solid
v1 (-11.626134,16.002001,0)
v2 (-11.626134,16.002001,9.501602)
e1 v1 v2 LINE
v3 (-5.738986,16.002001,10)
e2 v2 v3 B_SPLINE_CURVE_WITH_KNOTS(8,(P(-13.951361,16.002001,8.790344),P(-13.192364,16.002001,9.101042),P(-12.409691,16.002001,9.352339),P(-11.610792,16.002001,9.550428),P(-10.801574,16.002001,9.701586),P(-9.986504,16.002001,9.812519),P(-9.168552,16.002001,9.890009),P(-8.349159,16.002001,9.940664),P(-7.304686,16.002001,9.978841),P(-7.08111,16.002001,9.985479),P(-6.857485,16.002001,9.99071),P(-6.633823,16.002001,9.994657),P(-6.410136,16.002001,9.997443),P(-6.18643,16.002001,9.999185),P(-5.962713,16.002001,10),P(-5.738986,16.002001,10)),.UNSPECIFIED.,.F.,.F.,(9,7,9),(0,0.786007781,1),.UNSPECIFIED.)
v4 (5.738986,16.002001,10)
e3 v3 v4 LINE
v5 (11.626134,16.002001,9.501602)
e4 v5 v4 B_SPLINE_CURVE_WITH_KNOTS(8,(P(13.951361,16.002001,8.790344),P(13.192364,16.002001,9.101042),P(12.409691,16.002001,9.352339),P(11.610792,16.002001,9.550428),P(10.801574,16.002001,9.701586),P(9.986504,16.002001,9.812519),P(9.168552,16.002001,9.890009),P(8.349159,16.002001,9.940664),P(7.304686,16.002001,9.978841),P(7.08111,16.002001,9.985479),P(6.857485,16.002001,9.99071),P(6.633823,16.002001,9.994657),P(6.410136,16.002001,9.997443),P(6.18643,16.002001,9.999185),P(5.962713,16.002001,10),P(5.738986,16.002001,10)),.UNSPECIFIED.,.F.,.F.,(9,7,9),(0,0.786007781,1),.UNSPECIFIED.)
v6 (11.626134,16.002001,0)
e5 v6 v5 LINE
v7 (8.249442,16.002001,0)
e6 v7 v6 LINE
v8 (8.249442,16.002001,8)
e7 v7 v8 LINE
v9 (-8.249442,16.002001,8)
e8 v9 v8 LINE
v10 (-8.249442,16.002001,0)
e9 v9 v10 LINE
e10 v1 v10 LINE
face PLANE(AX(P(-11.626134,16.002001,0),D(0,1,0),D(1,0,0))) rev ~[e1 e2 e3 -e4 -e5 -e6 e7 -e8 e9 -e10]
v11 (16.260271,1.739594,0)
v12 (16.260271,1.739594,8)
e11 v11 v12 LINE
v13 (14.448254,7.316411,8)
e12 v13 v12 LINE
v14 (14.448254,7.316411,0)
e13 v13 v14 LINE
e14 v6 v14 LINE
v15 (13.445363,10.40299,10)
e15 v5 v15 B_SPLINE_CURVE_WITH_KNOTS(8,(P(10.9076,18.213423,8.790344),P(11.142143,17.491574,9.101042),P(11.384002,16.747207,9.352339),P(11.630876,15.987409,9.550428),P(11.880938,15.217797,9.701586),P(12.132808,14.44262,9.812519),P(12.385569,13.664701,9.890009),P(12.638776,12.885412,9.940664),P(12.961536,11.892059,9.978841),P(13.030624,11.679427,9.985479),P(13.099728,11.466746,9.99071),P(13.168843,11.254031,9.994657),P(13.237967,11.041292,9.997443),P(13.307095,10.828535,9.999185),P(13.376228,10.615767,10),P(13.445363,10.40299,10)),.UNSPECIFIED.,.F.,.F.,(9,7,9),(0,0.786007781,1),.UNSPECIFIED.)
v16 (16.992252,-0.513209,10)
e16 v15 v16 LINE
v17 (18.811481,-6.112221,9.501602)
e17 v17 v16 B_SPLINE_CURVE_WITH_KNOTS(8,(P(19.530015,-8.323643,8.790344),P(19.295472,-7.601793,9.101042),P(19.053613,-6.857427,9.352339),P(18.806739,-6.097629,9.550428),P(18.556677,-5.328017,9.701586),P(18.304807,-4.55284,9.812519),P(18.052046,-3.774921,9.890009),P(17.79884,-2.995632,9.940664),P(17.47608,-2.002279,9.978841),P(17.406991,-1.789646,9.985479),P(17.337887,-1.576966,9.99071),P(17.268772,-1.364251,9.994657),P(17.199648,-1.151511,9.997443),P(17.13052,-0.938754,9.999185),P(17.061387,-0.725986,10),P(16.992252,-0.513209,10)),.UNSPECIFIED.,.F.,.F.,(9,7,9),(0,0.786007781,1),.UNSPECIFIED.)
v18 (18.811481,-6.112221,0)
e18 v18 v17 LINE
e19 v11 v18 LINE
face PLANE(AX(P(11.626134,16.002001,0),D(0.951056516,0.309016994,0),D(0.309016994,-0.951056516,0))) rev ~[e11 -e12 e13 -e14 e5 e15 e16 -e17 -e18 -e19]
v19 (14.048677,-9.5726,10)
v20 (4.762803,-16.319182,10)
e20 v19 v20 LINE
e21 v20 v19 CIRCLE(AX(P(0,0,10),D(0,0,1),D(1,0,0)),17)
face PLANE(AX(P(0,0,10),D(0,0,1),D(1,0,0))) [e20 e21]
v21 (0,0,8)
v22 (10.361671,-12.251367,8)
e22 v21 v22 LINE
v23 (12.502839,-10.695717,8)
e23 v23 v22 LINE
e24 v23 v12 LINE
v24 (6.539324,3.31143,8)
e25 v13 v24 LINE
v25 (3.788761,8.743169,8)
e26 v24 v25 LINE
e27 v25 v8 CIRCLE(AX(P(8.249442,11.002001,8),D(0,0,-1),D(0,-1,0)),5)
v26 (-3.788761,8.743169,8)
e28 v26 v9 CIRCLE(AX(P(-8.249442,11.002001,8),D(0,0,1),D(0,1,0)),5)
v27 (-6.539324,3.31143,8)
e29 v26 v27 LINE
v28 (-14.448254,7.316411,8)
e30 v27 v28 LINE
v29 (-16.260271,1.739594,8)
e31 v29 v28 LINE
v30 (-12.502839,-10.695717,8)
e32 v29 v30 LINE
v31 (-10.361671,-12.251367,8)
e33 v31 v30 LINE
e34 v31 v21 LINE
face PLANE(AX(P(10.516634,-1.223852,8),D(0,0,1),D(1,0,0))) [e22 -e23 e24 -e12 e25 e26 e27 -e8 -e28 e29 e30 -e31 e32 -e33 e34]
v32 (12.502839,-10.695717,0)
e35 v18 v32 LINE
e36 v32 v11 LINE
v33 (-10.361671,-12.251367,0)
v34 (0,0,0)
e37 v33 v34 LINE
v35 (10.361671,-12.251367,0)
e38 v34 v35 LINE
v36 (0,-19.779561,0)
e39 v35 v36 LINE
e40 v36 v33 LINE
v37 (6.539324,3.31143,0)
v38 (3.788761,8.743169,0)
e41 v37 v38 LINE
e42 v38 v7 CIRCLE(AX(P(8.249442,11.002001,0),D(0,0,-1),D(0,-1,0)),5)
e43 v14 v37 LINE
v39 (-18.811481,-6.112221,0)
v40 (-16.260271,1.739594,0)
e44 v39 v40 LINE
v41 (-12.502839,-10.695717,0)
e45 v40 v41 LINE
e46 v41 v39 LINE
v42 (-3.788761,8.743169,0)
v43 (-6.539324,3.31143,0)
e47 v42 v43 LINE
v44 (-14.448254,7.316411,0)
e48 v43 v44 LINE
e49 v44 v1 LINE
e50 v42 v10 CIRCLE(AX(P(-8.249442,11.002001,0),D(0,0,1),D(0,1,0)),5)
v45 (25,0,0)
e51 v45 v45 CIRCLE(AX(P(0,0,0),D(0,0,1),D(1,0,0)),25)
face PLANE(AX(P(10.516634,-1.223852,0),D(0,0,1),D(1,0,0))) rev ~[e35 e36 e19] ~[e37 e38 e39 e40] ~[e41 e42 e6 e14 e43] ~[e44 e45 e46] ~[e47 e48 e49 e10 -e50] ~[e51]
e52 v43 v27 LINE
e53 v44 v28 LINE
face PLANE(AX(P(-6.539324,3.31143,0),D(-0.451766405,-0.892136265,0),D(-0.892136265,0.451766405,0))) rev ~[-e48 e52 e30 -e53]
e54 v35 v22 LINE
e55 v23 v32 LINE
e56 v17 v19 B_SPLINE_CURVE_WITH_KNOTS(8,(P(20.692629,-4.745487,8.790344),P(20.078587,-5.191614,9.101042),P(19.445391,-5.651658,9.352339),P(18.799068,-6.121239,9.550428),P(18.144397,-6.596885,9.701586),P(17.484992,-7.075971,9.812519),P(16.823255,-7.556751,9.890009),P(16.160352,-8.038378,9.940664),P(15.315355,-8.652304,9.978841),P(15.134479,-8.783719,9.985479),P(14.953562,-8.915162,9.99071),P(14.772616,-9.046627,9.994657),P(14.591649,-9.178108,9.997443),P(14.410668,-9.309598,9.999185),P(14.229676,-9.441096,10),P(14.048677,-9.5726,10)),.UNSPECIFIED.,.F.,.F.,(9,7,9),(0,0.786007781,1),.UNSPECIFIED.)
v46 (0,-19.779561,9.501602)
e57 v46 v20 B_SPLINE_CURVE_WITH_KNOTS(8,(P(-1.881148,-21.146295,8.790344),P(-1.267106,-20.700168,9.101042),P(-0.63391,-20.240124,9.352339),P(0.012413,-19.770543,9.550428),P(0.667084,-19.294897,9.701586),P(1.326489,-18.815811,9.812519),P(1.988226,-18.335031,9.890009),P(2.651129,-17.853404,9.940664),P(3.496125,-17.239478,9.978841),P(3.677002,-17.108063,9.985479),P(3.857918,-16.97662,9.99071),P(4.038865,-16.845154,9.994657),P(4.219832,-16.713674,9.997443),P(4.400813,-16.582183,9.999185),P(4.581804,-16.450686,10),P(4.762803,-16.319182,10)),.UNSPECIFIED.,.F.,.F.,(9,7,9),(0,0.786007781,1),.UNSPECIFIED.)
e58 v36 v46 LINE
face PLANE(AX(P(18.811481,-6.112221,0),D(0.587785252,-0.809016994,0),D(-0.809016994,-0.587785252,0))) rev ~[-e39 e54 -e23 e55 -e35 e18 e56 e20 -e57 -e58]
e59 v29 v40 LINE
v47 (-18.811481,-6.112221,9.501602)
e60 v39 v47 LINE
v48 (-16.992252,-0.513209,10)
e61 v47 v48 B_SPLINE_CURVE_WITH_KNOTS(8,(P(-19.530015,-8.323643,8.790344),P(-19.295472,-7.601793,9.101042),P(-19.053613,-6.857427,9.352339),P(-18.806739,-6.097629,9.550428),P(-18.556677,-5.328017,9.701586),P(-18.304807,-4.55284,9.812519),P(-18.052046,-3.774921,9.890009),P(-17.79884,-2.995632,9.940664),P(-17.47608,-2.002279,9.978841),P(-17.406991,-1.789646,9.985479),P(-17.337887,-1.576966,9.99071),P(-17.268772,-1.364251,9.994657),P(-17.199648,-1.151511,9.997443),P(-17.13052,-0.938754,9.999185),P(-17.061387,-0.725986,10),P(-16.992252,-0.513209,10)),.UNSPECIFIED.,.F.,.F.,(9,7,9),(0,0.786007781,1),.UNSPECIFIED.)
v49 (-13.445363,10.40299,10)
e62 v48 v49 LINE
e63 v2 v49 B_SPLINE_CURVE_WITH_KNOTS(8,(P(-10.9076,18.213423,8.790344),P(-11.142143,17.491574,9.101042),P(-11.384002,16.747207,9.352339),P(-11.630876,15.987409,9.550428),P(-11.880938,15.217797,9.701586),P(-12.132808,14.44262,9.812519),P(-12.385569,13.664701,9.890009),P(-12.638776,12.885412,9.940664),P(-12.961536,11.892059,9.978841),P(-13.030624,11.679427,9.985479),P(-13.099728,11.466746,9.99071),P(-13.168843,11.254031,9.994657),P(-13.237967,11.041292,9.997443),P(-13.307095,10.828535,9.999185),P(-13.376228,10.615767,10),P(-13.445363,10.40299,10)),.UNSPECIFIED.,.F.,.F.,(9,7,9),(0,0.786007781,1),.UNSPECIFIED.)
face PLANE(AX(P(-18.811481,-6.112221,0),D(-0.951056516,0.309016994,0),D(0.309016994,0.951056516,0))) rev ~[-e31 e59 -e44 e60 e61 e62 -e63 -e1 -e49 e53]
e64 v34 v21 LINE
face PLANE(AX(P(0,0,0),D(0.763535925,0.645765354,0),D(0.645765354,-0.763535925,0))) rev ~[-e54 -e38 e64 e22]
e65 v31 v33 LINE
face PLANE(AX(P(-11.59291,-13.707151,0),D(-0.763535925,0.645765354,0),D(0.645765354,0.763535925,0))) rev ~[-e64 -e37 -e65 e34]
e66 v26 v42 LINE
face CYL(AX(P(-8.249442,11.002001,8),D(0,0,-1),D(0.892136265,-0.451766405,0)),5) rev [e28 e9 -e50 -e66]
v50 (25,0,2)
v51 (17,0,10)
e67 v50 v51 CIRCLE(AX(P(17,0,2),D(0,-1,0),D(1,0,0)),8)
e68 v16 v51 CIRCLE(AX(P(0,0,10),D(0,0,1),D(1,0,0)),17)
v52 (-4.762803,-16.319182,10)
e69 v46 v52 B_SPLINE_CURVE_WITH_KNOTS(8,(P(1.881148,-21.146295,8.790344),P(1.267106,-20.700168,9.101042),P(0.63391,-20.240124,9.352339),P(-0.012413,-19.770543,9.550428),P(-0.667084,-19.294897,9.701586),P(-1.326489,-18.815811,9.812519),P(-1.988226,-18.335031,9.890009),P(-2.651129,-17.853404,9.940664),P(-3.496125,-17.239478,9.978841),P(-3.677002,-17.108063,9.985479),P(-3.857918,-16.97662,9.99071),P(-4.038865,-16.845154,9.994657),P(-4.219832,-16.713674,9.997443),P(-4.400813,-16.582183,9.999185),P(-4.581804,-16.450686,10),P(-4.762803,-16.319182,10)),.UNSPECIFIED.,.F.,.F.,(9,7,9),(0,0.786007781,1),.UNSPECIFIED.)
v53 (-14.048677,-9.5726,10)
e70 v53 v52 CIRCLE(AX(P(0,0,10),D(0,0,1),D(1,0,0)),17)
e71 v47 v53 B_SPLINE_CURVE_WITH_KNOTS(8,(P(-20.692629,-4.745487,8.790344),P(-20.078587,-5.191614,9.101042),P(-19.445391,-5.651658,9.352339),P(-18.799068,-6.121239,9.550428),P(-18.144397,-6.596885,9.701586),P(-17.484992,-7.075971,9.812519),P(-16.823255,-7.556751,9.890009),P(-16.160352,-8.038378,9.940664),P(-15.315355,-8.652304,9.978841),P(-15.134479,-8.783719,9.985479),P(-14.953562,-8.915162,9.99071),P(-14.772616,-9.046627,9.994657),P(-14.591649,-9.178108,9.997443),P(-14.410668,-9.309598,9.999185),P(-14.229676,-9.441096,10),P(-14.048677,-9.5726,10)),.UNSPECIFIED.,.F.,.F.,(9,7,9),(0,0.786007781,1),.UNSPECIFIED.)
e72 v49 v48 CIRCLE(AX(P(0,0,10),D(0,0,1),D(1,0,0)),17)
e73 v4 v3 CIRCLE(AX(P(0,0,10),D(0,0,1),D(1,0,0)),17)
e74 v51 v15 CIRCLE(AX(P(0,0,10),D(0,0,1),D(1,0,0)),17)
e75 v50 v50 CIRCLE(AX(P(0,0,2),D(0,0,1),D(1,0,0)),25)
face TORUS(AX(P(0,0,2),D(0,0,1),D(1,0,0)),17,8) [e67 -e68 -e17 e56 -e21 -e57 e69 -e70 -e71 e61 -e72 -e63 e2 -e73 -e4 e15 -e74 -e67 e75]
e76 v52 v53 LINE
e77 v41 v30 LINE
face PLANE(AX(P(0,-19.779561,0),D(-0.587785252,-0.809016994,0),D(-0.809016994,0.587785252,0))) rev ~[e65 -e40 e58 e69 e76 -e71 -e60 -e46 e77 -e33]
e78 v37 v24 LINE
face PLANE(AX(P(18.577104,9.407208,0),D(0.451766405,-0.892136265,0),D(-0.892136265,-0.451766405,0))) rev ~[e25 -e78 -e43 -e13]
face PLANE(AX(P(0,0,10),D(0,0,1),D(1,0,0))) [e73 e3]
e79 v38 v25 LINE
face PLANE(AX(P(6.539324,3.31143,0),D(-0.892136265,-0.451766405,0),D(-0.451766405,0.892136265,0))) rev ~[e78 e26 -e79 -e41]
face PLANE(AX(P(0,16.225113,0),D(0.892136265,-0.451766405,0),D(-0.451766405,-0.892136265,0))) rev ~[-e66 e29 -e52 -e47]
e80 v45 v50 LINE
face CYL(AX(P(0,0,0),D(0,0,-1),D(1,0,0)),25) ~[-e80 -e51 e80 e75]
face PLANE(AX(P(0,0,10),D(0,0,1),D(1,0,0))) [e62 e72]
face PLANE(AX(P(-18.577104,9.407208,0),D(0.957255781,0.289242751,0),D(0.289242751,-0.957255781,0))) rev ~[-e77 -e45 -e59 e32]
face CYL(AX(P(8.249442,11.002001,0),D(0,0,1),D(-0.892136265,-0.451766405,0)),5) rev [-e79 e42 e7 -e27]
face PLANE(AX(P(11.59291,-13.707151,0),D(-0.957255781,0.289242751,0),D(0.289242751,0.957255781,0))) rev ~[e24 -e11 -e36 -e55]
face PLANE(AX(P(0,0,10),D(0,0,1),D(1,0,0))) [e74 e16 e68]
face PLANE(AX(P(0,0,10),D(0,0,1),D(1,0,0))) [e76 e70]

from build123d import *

# Parameters (mm, degrees)
F0_R     = 25
F1_DEPTH = 10
F4_DEPTH = 8
F5_R     = 5


# Not quite as in the source:
# - a fillet or chamfer that OpenCascade refuses, or shapes differently, is made with other operations: its cross-section is extruded or revolved along the edge and cut away or added


with BuildPart() as f1:
    # F0 (on Top) → F1 (new body)
    with BuildSketch(Plane.XY):
        Circle(F0_R)
        Polygon((-18.8114806731, -6.112220586), (-11.6261344347, 16.0020012408), (11.6261344347, 16.0020012408), (18.8114806731, -6.112220586), (0, -19.7795613097), align=None, mode=Mode.SUBTRACT)
    extrude(amount=F1_DEPTH)

    # F2: fillet of radius 8 on 1 edges, made by hand

    # F2_s1 → F2_t2 (revolve, cut)
    with BuildSketch(Plane.XZ):
        with BuildLine():
            ThreePointArc((25, 2), (22.6568542495, 7.6568542495), (17, 10))
            Line((17, 10), (25, 10))
            Line((25, 10), (25, 2))
        make_face()
    revolve(axis=Axis((0, 0, 10), (0, 0, 1)), mode=Mode.SUBTRACT)

    # F3 (on Top) → F4 (join)
    with BuildSketch(Plane.XY):
        Polygon((6.539323839, 3.3114300304), (0, 0), (11.5929096937, -13.7071507052), (18.5771044344, 9.4072083011), align=None)
        Polygon((-6.539323839, 3.3114300304), (0, 0), (6.539323839, 3.3114300304), (0, 16.2251126021), align=None)
        Polygon((-11.5929096937, -13.7071507052), (0, 0), (-6.539323839, 3.3114300304), (-18.5771044344, 9.4072083011), align=None)
    extrude(amount=F4_DEPTH)

    # F5
    f5_edges = [f1.edges().sort_by_distance(p)[0] for p in [
        (-0.112981, 16.002001, 4),
        (0.112981, 16.002001, 4),
    ]]
    fillet(f5_edges, radius=F5_R)


solid = f1.part
